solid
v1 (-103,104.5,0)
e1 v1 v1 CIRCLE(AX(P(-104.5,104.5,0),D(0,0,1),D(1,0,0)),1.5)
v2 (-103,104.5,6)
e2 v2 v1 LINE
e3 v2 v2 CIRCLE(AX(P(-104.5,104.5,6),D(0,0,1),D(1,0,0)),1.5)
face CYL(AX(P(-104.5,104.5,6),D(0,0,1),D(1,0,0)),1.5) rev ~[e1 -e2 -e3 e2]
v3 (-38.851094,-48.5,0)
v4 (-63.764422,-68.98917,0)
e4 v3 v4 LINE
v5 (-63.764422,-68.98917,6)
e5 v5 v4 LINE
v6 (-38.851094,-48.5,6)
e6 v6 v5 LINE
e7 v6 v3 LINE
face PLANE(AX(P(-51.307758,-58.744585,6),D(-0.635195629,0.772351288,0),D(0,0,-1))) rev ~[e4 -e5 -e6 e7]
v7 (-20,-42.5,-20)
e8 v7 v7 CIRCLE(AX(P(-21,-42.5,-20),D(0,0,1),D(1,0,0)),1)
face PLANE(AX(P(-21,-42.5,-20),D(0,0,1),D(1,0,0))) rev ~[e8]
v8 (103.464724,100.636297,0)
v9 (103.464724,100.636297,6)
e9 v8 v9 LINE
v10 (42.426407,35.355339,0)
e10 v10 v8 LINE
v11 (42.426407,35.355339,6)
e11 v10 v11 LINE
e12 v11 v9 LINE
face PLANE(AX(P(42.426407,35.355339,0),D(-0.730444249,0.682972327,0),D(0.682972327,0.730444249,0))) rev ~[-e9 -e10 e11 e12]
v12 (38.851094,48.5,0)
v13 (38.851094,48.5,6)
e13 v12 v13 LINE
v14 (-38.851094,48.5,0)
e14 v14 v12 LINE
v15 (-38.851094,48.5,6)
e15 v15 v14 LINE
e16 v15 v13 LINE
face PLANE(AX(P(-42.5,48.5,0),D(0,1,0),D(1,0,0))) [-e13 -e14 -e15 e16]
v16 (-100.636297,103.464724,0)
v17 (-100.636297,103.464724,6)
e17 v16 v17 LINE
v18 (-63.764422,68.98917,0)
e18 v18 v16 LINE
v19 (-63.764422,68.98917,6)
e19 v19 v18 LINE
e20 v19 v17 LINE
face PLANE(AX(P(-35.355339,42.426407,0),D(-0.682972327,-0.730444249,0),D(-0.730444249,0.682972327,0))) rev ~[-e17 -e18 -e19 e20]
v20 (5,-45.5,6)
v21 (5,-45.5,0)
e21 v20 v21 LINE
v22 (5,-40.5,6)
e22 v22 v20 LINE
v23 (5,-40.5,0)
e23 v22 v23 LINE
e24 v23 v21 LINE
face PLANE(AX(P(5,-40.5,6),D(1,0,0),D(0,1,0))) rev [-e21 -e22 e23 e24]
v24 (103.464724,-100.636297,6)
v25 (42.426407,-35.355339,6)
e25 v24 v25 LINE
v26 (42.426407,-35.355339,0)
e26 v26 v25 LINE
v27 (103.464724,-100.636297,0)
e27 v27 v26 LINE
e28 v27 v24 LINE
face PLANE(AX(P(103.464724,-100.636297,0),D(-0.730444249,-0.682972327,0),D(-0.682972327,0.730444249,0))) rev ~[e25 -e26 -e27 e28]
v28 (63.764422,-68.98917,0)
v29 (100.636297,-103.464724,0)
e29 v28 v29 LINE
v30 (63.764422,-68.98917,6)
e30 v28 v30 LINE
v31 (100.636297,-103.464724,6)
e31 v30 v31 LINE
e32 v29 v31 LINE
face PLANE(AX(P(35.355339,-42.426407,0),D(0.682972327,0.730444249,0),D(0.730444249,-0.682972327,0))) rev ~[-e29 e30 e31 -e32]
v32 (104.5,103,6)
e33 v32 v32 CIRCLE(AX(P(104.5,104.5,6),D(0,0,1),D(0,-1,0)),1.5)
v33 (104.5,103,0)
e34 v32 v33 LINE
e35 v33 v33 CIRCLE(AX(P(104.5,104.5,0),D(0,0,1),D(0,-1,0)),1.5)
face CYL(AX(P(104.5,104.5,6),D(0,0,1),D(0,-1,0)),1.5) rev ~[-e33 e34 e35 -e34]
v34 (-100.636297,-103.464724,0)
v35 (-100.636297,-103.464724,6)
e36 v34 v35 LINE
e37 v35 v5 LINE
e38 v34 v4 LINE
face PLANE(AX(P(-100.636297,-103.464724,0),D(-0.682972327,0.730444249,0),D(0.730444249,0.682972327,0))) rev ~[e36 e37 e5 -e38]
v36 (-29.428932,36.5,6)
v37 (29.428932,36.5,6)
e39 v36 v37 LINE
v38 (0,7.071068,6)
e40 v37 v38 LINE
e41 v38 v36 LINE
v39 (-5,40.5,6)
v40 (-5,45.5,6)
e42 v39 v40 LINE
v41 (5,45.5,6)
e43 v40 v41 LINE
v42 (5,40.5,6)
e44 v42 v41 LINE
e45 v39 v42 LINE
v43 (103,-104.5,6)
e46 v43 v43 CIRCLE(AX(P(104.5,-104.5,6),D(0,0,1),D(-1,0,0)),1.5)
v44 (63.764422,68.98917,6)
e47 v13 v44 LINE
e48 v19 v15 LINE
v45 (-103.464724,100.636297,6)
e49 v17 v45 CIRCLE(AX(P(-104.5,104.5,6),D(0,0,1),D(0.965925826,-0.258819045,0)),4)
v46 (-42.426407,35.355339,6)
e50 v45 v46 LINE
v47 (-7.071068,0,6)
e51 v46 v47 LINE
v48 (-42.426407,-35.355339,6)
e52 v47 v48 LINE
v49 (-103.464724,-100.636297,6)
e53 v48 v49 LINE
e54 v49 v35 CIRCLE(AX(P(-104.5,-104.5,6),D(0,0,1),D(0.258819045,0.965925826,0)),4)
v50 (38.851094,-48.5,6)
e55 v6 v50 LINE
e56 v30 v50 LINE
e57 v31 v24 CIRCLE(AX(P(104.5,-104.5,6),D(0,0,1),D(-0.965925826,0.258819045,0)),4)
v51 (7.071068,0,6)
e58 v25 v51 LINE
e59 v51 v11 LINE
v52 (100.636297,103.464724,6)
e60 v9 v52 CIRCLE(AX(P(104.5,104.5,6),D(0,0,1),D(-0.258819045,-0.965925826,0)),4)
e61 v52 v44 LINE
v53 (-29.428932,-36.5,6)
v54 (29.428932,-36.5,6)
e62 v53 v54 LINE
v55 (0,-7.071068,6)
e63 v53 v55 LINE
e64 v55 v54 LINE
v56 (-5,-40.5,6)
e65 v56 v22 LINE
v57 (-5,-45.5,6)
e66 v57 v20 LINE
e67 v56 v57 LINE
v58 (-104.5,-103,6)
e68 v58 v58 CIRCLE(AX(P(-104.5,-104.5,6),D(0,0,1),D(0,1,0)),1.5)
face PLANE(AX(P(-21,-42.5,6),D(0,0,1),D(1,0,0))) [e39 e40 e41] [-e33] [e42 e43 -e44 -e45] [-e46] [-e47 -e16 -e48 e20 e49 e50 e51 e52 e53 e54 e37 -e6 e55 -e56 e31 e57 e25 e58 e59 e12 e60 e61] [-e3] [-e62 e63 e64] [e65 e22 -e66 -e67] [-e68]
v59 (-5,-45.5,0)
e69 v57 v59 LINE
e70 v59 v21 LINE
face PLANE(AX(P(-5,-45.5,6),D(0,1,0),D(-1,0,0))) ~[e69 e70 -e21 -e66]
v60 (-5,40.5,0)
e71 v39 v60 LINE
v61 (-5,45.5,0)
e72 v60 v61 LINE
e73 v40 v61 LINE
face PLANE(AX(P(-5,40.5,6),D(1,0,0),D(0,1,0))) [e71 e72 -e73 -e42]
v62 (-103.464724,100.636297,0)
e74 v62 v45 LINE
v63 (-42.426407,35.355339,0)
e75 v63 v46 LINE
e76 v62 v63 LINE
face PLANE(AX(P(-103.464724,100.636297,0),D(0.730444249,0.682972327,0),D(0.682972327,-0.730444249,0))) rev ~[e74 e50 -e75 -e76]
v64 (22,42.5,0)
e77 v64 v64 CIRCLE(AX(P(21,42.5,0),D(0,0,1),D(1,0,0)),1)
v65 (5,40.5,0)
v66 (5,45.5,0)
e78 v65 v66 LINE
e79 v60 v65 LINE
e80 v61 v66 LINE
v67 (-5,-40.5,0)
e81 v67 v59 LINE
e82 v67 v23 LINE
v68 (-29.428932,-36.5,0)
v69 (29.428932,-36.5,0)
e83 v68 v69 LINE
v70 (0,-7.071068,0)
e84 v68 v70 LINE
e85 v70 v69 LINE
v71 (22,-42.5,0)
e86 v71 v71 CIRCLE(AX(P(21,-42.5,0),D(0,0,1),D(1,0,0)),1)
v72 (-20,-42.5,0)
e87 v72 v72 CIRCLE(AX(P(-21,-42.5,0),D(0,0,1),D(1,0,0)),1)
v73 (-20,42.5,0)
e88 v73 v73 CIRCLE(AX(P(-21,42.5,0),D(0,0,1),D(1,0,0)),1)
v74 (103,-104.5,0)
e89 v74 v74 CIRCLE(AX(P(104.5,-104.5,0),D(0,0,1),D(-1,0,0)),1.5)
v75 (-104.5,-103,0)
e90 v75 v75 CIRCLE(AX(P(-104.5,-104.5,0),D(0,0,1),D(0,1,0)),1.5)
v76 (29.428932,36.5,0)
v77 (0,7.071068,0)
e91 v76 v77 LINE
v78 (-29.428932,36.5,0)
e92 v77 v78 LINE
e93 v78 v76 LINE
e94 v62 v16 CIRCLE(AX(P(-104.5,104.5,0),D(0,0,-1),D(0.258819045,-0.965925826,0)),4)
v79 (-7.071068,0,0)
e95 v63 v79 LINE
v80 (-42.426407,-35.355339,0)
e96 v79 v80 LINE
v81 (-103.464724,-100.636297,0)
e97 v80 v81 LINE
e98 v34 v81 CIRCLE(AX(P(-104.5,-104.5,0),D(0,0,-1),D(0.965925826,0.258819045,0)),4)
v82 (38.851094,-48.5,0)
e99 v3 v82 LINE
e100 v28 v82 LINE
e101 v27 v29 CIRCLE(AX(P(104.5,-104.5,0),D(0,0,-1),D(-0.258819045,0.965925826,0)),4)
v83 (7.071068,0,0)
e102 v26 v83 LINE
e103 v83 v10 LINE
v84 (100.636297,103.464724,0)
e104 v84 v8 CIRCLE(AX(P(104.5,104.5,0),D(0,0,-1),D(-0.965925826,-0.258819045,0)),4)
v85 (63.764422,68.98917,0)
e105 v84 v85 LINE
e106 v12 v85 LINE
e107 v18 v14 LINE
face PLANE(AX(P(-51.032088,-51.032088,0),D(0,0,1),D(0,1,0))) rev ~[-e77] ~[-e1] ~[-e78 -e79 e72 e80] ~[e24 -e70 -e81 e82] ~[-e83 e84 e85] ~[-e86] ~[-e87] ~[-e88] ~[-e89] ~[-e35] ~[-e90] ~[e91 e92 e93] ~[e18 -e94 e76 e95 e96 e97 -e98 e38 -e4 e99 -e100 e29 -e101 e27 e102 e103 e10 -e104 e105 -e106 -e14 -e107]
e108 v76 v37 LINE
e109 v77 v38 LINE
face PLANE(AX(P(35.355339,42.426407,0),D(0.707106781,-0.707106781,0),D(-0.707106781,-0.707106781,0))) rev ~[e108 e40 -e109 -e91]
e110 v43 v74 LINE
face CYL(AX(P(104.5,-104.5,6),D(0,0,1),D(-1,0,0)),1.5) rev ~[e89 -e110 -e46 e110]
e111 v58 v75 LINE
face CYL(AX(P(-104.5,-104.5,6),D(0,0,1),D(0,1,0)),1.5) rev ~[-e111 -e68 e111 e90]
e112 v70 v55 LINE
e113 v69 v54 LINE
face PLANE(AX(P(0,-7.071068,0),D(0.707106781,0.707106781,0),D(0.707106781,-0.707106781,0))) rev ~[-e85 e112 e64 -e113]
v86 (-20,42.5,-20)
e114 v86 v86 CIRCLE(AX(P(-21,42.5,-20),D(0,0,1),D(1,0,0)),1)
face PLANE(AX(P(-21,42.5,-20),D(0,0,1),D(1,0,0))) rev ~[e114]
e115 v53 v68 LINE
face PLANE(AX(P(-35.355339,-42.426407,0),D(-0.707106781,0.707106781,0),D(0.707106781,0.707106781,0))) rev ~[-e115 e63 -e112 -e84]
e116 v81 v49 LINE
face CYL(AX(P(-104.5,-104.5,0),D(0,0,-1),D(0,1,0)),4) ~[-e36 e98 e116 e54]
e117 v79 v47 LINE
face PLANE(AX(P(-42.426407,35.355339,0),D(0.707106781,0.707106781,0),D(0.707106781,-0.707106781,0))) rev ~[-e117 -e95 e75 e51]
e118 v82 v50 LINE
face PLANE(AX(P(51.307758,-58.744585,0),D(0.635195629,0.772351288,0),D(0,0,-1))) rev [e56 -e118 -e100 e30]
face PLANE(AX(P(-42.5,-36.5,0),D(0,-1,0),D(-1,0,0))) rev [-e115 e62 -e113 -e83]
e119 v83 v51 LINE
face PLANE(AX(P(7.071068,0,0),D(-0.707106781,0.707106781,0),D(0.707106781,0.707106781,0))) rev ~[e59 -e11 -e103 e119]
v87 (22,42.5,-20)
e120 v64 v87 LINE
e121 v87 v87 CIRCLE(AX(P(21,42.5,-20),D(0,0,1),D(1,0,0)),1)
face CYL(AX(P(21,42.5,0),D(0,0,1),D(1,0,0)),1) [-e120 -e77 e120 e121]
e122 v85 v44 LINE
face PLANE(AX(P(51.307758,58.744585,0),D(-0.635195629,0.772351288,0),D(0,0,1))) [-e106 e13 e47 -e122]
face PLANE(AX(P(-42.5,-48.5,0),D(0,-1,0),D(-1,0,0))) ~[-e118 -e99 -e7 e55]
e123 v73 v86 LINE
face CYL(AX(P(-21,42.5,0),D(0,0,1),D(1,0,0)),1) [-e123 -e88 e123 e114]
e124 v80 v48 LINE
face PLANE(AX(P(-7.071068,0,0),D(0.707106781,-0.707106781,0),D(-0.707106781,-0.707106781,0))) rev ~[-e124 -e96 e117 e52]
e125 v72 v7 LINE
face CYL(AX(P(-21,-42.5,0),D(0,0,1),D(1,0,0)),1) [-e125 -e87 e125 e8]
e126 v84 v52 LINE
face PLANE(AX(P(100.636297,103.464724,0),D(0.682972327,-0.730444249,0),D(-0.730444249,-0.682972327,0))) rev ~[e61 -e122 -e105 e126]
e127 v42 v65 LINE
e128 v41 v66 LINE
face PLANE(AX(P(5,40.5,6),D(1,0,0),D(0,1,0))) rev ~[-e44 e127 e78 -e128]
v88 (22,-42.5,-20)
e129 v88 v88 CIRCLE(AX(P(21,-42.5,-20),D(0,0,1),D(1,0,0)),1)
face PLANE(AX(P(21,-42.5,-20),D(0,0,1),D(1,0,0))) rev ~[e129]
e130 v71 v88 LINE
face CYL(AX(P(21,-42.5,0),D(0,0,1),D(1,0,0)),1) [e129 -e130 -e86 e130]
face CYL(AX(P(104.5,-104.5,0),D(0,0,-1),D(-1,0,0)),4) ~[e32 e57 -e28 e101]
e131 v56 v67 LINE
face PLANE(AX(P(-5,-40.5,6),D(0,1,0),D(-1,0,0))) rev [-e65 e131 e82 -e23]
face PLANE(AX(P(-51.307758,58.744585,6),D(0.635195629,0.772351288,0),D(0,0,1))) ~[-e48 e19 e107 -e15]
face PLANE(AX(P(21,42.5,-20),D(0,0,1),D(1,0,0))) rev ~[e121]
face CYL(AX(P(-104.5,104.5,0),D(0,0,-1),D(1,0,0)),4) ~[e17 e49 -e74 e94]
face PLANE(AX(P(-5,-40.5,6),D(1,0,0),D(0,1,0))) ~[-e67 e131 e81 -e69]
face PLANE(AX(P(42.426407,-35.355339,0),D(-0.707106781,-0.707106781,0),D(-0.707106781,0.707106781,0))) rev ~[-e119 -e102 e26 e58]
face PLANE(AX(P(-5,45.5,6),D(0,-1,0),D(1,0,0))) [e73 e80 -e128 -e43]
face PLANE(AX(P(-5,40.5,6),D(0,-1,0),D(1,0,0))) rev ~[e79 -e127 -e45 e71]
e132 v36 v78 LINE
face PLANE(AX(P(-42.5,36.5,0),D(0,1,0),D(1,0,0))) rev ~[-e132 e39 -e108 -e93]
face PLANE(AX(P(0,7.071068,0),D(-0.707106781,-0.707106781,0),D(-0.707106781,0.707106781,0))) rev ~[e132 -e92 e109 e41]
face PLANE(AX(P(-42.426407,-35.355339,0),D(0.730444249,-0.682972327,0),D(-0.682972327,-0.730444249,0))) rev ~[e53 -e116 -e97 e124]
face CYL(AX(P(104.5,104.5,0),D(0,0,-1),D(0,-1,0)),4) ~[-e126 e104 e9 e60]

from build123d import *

# Parameters (mm, degrees)
F0_R         = 4
F1_DEPTH     = 6
F3_DEPTH     = 6
F4_R         = 1.5
F5_DEPTH     = 6.001
F6_COUNT     = 4
F8_W         = 85
F8_H         = 12
F9_DEPTH     = 6
F10_R        = 3.55
F10_R_2      = 2.5
F10_W        = 10
F10_H        = 5
F11_DEPTH    = 6.001
F12_C1_SIZE2 = 3
F12_C1_SIZE  = 30
F12_C2_SIZE2 = 30
F12_C2_SIZE  = 3
F12_C3_SIZE2 = 3
F12_C3_SIZE  = 30
F12_C4_SIZE2 = 30
F12_C4_SIZE  = 3
F13_R        = 1
F14_DEPTH    = 20
F15_R        = 3.55
F15_R_2      = 2.5
F16_DEPTH    = 6


# Not quite as in the source:
# - a pattern or mirror of a feature is missing from the dataset's text; its kind, count and spacing are read off the source's solid


with BuildPart() as f1:
    # F0 (on Top) → F1 (new body)
    with BuildSketch(Plane.XY):
        with Locations((-104.5, 104.5)):
            Circle(F0_R)
    extrude(amount=F1_DEPTH)

    # F2 (on Top) → F3 (join, through all)
    with BuildSketch(Plane.XY):
        Polygon((-7.0710678119, 0), (0, 0), (0, 7.0710678119), (-35.3553390593, 42.4264068712), (-100.6362966948, 103.4647238196), (-103.4647238196, 100.6362966948), (-42.4264068712, 35.3553390593), align=None)
    extrude(amount=F3_DEPTH)

    # F4 (on face) → F5 (cut, through all)
    with BuildSketch(Plane.XY.offset(6)):
        with Locations((-104.5, 104.5)):
            Circle(F4_R)
    extrude(amount=-F5_DEPTH, mode=Mode.SUBTRACT)


with BuildPart() as f6_1:
    # F6: instance of F1
    add(f1.part.rotate(Axis((0, 0, 3), (0, 0, -1)), 1 * 360 / F6_COUNT))


with BuildPart() as f6_2:
    # F6: instance of F1
    add(f1.part.rotate(Axis((0, 0, 3), (0, 0, -1)), 2 * 360 / F6_COUNT))


with BuildPart() as f6_3:
    # F6: instance of F1
    add(f1.part.rotate(Axis((0, 0, 3), (0, 0, -1)), 3 * 360 / F6_COUNT))


with BuildPart() as f1_1:
    add(f1.part)

    # F7: union F6_1, F6_2, F6_3
    add(f6_1.part)
    add(f6_2.part)
    add(f6_3.part)

    # F8 (on Top) → F9 (join, through all)
    with BuildSketch(Plane.XY):
        with Locations((0, 42.5)):
            Rectangle(F8_W, F8_H)
    f9 = extrude(amount=F9_DEPTH)

    # F9_copies: F9 across plane
    add(f9.mirror(Plane(origin=(0, 0, 0), x_dir=(0, 0, -1), z_dir=(0, -1, 0))))

    # F10 (on face) → F11 (cut, through all)
    with BuildSketch(Plane.XY.offset(6)):
        with Locations((-21, 42.5)):
            Circle(F10_R)
        with Locations((21, 42.5)):
            Circle(F10_R_2)
        with Locations((0, 43)):
            Rectangle(F10_W, F10_H)
    f11 = extrude(amount=-F11_DEPTH, mode=Mode.SUBTRACT)

    # F11_copies: F11 across plane
    add(f11.mirror(Plane(origin=(0, 0, 0), x_dir=(0, 0, -1), z_dir=(0, -1, 0))), mode=Mode.SUBTRACT)

    # F12: chamfer of 3 x 30 on 4 edges, made by hand

    # F12_c1
    f12_c1_edges = [f1_1.edges().sort_by_distance(p)[0] for p in [
        (-41.8510944399, 48.5, 3),
    ]]
    f12_c1_side = f1_1.faces().sort_by_distance((-41.8949210948, 48.5409783396, 3))[0]
    chamfer(f12_c1_edges, length=F12_C1_SIZE, length2=F12_C1_SIZE2, reference=f12_c1_side)

    # F12_c2
    f12_c2_edges = [f1_1.edges().sort_by_distance(p)[0] for p in [
        (41.8510944399, 48.5, 3),
    ]]
    f12_c2_side = f1_1.faces().sort_by_distance((41.7910944399, 48.5, 3))[0]
    chamfer(f12_c2_edges, length=F12_C2_SIZE, length2=F12_C2_SIZE2, reference=f12_c2_side)

    # F12_c3
    f12_c3_edges = [f1_1.edges().sort_by_distance(p)[0] for p in [
        (41.8510944399, -48.5, 3),
    ]]
    f12_c3_side = f1_1.faces().sort_by_distance((41.8949210948, -48.5409783396, 3))[0]
    chamfer(f12_c3_edges, length=F12_C3_SIZE, length2=F12_C3_SIZE2, reference=f12_c3_side)

    # F12_c4
    f12_c4_edges = [f1_1.edges().sort_by_distance(p)[0] for p in [
        (-41.8510944399, -48.5, 3),
    ]]
    f12_c4_side = f1_1.faces().sort_by_distance((-41.7910944399, -48.5, 3))[0]
    chamfer(f12_c4_edges, length=F12_C4_SIZE, length2=F12_C4_SIZE2, reference=f12_c4_side)



with BuildPart() as f14:
    # F13 (on Top) → F14 (new body)
    with BuildSketch(Plane.XY):
        with Locations((-21, 42.5)):
            Circle(F13_R)
    extrude(amount=-F14_DEPTH)


with BuildPart() as f14b:
    # F13 (on Top) → F14, piece 2 (new body)
    with BuildSketch(Plane.XY):
        with Locations((21, 42.5)):
            Circle(F13_R)
    extrude(amount=-F14_DEPTH)


with BuildPart() as f14c:
    # F13 (on Top) → F14, piece 3 (new body)
    with BuildSketch(Plane.XY):
        with Locations((-21, -42.5)):
            Circle(F13_R)
    extrude(amount=-F14_DEPTH)


with BuildPart() as f14d:
    # F13 (on Top) → F14, piece 4 (new body)
    with BuildSketch(Plane.XY):
        with Locations((21, -42.5)):
            Circle(F13_R)
    extrude(amount=-F14_DEPTH)


with BuildPart() as f1_2:
    add(f1_1.part)

    add(f14.part)  # F16 merges F14

    add(f14b.part)  # F16 merges F14b

    add(f14c.part)  # F16 merges F14c

    add(f14d.part)  # F16 merges F14d
    # F15 (on face) → F16 (join)
    with BuildSketch(Plane.XY.offset(6)):
        with Locations((-21, -42.5)):
            Circle(F15_R)
        with Locations((21, -42.5)):
            Circle(F15_R_2)
        with Locations((21, 42.5)):
            Circle(F15_R_2)
        with Locations((-21, 42.5)):
            Circle(F15_R)
    extrude(amount=-F16_DEPTH)


solid = f1_2.part
